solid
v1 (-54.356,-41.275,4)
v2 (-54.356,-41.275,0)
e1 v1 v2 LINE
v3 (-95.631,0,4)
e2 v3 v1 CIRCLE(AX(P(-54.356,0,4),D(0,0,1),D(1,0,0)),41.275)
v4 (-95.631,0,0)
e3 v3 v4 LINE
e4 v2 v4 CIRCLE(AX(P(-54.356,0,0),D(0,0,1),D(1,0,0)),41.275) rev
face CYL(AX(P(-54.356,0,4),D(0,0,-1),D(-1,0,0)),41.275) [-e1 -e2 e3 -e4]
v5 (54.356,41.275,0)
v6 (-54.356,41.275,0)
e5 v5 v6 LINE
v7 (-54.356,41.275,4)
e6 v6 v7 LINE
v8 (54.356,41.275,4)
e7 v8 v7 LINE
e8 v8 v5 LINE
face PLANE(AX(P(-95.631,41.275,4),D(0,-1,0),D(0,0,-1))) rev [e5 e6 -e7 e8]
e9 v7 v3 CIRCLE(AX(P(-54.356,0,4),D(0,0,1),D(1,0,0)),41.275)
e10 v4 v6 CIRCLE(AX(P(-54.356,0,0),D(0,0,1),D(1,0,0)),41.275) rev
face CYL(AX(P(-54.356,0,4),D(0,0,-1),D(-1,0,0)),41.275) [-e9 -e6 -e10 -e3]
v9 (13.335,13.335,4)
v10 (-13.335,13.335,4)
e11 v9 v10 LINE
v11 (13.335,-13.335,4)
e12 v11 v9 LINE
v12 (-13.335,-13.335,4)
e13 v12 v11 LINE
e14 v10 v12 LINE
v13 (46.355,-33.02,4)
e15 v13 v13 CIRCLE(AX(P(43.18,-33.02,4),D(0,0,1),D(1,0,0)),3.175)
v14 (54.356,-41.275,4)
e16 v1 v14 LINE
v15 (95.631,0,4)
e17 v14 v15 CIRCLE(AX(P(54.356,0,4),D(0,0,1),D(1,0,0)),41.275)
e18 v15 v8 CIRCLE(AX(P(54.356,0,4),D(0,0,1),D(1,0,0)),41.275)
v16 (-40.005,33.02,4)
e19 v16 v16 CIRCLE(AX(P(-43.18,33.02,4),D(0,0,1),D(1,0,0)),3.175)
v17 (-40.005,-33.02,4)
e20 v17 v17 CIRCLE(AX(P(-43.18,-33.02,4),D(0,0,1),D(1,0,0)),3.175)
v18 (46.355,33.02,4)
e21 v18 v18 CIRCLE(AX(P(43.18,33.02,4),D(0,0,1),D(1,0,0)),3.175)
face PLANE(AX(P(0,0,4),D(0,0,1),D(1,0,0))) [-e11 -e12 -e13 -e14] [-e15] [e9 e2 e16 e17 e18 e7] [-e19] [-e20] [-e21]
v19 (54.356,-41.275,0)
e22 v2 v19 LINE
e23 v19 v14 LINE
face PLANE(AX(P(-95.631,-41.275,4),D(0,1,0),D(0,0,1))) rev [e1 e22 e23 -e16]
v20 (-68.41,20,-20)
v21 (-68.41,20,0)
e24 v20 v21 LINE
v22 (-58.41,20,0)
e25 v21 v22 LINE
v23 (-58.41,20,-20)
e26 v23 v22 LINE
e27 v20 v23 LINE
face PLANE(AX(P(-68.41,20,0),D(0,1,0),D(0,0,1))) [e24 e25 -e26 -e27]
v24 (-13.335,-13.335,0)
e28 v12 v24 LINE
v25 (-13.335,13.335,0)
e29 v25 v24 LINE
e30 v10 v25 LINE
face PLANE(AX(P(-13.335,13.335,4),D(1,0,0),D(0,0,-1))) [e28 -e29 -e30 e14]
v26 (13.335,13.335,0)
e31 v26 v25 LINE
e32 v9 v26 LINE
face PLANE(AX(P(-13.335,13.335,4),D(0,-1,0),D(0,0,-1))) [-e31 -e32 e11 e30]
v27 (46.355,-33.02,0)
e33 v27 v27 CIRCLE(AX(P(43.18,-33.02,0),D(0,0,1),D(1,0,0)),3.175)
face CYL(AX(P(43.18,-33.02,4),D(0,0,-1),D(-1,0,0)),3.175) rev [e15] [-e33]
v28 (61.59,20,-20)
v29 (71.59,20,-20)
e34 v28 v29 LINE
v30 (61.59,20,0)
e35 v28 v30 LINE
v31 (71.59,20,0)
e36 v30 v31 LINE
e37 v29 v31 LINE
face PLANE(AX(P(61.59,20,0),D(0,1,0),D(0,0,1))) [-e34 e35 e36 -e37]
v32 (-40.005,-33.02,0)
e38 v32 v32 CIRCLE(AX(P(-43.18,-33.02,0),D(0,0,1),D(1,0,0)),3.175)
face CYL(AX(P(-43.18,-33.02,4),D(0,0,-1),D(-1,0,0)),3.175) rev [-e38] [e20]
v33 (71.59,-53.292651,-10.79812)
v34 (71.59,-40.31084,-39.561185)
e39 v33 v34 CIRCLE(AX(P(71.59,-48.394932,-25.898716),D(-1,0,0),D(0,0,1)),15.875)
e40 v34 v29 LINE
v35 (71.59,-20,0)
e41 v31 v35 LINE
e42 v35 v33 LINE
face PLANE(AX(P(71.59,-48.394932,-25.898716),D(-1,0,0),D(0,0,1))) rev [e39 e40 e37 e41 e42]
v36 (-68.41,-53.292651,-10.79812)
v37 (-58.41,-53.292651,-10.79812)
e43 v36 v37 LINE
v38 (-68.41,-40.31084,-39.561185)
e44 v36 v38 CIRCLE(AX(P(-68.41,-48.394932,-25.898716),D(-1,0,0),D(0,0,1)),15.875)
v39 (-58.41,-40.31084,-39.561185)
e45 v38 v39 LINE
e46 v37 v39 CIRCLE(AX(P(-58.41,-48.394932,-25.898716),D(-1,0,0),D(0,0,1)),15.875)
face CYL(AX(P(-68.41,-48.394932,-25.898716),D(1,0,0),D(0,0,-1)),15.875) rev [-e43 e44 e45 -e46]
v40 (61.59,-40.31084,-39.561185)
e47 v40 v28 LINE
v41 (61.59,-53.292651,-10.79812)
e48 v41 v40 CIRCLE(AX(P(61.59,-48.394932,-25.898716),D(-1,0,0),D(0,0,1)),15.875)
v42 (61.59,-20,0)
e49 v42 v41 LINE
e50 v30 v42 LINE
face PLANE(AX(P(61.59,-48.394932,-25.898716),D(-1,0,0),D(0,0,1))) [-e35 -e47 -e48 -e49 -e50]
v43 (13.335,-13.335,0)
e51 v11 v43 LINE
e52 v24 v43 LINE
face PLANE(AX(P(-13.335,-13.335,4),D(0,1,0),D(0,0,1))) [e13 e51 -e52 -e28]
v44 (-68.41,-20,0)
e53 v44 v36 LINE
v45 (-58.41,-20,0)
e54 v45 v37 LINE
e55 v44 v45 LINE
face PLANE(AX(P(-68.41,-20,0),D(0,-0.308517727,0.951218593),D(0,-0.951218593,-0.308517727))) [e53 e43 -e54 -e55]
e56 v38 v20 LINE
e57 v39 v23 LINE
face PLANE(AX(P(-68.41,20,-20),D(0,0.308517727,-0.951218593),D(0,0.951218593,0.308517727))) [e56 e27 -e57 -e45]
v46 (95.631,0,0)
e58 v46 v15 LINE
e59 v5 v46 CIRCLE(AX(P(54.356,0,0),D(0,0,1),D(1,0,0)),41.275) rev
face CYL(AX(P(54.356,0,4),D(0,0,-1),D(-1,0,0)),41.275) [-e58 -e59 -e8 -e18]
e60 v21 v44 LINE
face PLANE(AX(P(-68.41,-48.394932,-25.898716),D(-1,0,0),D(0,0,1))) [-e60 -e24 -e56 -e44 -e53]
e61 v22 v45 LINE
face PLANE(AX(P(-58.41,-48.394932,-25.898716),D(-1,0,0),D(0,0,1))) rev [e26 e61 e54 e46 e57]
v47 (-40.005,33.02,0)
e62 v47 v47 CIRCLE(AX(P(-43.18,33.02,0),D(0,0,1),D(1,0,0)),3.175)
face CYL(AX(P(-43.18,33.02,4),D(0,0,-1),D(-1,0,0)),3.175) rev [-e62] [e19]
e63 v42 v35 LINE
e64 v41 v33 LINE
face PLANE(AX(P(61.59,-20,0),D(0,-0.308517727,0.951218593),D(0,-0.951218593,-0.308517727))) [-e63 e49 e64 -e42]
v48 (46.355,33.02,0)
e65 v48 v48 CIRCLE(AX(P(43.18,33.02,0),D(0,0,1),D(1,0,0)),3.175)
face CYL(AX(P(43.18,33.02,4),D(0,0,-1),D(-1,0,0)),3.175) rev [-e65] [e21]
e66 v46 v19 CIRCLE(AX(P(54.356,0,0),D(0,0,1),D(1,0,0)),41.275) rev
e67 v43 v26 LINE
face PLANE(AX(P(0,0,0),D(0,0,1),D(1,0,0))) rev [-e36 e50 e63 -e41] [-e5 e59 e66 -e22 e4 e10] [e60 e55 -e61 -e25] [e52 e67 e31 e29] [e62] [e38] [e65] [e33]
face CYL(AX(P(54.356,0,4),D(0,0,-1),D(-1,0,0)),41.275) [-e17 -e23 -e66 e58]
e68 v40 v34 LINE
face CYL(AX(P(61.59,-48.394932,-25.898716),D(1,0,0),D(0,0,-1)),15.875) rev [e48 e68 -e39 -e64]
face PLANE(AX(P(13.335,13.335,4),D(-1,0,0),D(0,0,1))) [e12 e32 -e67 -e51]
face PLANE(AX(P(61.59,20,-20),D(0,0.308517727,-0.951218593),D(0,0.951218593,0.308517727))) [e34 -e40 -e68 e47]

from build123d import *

# Parameters (mm, degrees)
SKETCH1_W           = 191.262
SKETCH1_H           = 82.55
SKETCH1_R           = 3.175
SKETCH1_W_2         = 26.67
SKETCH1_H_2         = 26.67
BOSS_EXTRUDE1_DEPTH = 4
FILLET5_R           = 41.275
BOSS_EXTRUDE2_DEPTH = 10
LPATTERN1_COUNT     = 2
LPATTERN1_PITCH     = 130


with BuildPart() as part:
    # Sketch1 → Boss-Extrude1 (new body)
    with BuildSketch(Plane.XY):
        Rectangle(SKETCH1_W, SKETCH1_H)
        with Locations((-43.18, 33.02)):
            Circle(SKETCH1_R, mode=Mode.SUBTRACT)
        with Locations((43.18, 33.02)):
            Circle(SKETCH1_R, mode=Mode.SUBTRACT)
        with Locations((43.18, -33.02)):
            Circle(SKETCH1_R, mode=Mode.SUBTRACT)
        with Locations((-43.18, -33.02)):
            Circle(SKETCH1_R, mode=Mode.SUBTRACT)
        Rectangle(SKETCH1_W_2, SKETCH1_H_2, mode=Mode.SUBTRACT)
    extrude(amount=BOSS_EXTRUDE1_DEPTH)

    # Fillet5
    fillet5_edges = [part.edges().sort_by_distance(p)[0] for p in [
        (-95.631, -41.275, 2),
        (95.631, -41.275, 2),
        (95.631, 41.275, 2),
        (-95.631, 41.275, 2),
    ]]
    fillet(fillet5_edges, radius=FILLET5_R - 0.0001)  # a hair under: the kernel refuses the full size

    # Sketch2 → Boss-Extrude2 (add)
    with BuildSketch(Plane(origin=(71.59, 0, 0), x_dir=(0, 0, -1), z_dir=(1, 0, 0))):
        with BuildLine():
            Line((0, 20), (20, 20))
            Line((20, 20), (39.561185263, -40.310839577))
            ThreePointArc((39.561185263, -40.310839577), (19.368102567, -33.925421898), (10.798120439, -53.292650765))
            Line((10.798120439, -53.292650765), (0, -20))
            Line((0, -20), (0, 20))
        make_face()
    boss_extrude2 = extrude(amount=-BOSS_EXTRUDE2_DEPTH)

    # LPattern1: Boss-Extrude2 ×2
    with Locations(*[(-i * LPATTERN1_PITCH, 0, 0) for i in range(1, LPATTERN1_COUNT)]):
        add(boss_extrude2)


solid = part.part
